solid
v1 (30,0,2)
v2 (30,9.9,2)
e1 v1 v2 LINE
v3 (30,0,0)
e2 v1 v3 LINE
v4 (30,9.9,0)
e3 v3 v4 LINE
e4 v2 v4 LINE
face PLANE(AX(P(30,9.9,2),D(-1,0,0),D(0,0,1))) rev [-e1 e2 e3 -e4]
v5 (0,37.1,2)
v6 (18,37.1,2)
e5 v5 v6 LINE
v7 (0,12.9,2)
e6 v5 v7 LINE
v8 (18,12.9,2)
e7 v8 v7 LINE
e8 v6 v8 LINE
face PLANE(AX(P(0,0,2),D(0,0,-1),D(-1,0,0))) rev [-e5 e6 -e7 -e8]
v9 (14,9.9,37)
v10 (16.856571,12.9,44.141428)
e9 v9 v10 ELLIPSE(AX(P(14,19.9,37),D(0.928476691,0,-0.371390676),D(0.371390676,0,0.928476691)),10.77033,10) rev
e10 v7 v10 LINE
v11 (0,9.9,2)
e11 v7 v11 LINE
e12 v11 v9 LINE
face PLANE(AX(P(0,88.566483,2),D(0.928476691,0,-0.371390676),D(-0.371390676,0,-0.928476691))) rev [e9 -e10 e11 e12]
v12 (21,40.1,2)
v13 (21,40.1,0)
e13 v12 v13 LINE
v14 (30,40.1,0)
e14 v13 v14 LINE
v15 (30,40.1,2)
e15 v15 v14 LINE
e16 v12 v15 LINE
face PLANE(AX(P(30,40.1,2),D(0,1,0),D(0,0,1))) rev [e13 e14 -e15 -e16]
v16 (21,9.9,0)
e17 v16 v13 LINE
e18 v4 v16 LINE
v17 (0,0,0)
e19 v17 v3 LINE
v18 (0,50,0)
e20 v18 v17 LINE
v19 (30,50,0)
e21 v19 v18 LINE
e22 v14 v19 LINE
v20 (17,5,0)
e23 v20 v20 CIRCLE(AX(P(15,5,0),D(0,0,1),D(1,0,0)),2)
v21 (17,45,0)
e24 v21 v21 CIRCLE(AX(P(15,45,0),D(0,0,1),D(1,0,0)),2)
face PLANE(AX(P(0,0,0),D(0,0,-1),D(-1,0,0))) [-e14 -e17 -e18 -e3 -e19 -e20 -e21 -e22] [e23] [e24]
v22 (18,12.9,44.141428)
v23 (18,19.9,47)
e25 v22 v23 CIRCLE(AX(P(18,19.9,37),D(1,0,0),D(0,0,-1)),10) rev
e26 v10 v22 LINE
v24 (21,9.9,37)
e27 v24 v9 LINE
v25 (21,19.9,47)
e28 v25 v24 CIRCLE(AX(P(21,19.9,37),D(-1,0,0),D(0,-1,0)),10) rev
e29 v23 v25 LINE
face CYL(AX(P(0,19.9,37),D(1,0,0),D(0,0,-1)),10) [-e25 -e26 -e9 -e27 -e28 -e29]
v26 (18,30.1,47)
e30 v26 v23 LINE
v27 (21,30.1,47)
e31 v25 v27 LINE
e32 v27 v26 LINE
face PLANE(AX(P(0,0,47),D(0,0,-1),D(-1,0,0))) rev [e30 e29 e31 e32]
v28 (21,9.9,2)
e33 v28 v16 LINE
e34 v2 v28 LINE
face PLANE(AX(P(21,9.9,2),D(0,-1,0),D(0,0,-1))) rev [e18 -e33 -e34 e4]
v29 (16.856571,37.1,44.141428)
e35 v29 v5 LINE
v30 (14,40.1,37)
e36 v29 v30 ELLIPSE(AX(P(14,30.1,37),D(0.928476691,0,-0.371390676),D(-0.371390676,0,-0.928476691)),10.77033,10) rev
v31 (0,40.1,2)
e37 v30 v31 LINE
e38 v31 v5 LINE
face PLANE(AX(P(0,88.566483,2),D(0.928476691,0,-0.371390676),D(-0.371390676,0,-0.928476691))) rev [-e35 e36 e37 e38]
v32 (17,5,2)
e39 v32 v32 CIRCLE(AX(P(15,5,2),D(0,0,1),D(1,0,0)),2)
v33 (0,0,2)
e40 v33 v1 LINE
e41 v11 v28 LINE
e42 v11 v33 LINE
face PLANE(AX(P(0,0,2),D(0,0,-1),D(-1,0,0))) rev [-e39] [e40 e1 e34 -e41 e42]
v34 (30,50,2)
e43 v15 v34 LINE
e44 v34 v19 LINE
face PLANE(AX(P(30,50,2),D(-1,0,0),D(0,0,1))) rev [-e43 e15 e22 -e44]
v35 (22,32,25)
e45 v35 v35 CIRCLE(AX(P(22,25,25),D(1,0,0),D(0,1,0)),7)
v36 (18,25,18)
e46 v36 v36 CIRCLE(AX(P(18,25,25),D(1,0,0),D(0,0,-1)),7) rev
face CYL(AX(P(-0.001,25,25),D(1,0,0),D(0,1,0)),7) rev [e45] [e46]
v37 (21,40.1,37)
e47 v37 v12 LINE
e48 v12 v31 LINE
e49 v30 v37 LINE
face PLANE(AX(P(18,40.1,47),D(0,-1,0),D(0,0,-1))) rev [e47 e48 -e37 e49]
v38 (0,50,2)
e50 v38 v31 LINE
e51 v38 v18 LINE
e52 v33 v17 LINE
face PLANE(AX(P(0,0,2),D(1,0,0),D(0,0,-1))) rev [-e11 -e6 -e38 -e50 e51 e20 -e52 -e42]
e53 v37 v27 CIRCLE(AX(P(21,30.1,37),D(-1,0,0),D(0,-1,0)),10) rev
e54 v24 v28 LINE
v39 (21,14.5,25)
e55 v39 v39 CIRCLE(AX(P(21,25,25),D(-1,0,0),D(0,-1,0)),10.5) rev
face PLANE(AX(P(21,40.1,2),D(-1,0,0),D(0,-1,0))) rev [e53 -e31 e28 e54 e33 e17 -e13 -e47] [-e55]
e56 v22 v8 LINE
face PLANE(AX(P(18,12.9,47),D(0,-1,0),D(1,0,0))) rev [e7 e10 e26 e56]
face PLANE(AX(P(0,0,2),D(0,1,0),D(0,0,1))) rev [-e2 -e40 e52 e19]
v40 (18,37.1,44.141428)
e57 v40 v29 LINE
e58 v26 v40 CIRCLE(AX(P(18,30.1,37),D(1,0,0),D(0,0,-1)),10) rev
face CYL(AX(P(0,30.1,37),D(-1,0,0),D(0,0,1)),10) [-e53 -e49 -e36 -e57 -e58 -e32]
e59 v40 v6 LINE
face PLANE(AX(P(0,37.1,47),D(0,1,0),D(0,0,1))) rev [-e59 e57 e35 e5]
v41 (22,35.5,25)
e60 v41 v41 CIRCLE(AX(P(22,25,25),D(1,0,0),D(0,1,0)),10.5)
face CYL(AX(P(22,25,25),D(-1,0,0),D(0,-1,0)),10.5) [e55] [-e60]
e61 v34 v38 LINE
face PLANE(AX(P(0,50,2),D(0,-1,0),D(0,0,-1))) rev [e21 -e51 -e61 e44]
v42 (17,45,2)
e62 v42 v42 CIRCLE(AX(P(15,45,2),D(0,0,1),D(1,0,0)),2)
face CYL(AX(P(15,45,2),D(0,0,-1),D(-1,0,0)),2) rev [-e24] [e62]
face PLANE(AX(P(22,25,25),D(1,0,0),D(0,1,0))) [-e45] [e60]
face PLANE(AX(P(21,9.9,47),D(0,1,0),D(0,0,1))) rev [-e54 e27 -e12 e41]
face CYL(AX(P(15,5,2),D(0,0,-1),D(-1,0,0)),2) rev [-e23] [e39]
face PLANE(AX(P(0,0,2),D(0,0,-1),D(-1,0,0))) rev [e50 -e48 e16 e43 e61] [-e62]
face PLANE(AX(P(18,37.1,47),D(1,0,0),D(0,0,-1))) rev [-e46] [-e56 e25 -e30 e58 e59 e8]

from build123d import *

# Parameters (mm, degrees)
ESQUISSE1_R             = 2
BOSS_EXTRU_1_DEPTH      = 2
BOSS_EXTRU_2_DEPTH      = 45
ENL_V_MAT_EXTRU_2_REACH = 70.68
ESQUISSE4_R             = 10.5
BOSS_EXTRU_3_DEPTH      = 1
ENL_V_MAT_EXTRU_3_REACH = 74.062
ESQUISSE5_R             = 7
CONG_1_R                = 10


with BuildPart() as part:
    # Esquisse1 → Boss.-Extru.1 (new body)
    with BuildSketch(Plane.XY):
        Polygon((30, 40.1), (21, 40.1), (21, 9.9), (30, 9.9), (30, 0), (0, 0), (0, 50), (30, 50), align=None)
        with Locations((15, 45)):
            Circle(ESQUISSE1_R, mode=Mode.SUBTRACT)
        with Locations((15, 5)):
            Circle(ESQUISSE1_R, mode=Mode.SUBTRACT)
    extrude(amount=BOSS_EXTRU_1_DEPTH)

    # Esquisse2 → Boss.-Extru.2 (add)
    with BuildSketch(Plane.XY.offset(2)):
        Polygon((18, 40.1), (0, 40.1), (0, 37.1), (18, 37.1), (18, 12.9), (0, 12.9), (0, 9.9), (18, 9.9), (21, 9.9), (21, 40.1), align=None)
    extrude(amount=BOSS_EXTRU_2_DEPTH)

    # Enlèv. mat.-Extru.2: up to this face of the body (flat: up to its plane)
    enl_v_mat_extru_2_end = Plane(part.part.faces().sort_by_distance((10.5, 40.1, 24.5))[0])
    # Esquisse3 → Enlèv. mat.-Extru.2 (cut, up to the picked face)
    with BuildSketch(Plane.XZ.offset(-9.9), mode=Mode.PRIVATE) as enl_v_mat_extru_2_sk1:
        Polygon((0, 2), (18, 47), (0, 47), align=None)
    enl_v_mat_extru_2_tool1 = split(extrude(enl_v_mat_extru_2_sk1.sketch, amount=-ENL_V_MAT_EXTRU_2_REACH, mode=Mode.PRIVATE), bisect_by=enl_v_mat_extru_2_end, keep=Keep.BOTH, mode=Mode.PRIVATE)
    add(enl_v_mat_extru_2_tool1.solids().sort_by(Axis((6, 9.9, 32), (0, 1, 0)))[0], mode=Mode.SUBTRACT)

    # Esquisse4 → Boss.-Extru.3 (add)
    with BuildSketch(Plane(origin=(21, 0, 0), x_dir=(0, 0, -1), z_dir=(1, 0, 0))):
        with Locations(Location((-25, 25, 0), (0, 0, 270))):
            Circle(ESQUISSE4_R)
    extrude(amount=BOSS_EXTRU_3_DEPTH)

    # Esquisse5 → Enlèv. mat.-Extru.3 (cut, up to next)
    with BuildSketch(Plane(origin=(22, 0, 0), x_dir=(0, 0, -1), z_dir=(1, 0, 0)), mode=Mode.PRIVATE) as enl_v_mat_extru_3_sk1:
        with Locations(Location((-25, 25, 0), (0, 0, 90))):
            Circle(ESQUISSE5_R)
    enl_v_mat_extru_3_tool1 = extrude(enl_v_mat_extru_3_sk1.sketch, amount=-ENL_V_MAT_EXTRU_3_REACH, mode=Mode.PRIVATE) & part.part
    add(enl_v_mat_extru_3_tool1.solids().sort_by_distance((22, 25, 25))[0], mode=Mode.SUBTRACT)

    # Congé1
    # the kernel refuses this fillet: 10 mm, written as the material it takes off along each edge
    with BuildSketch(Plane(origin=(-7, 40.1, 47), x_dir=(0, 0, -1), z_dir=(1, 0, 0))) as cong_1_piece_1:
        with BuildLine():
            CenterArc((CONG_1_R, -CONG_1_R), CONG_1_R, 90, 90)
            Line((0, -CONG_1_R), (0, 0))
            Line((0, 0), (CONG_1_R, 0))
        make_face()
    extrude(amount=53, mode=Mode.SUBTRACT)
    with BuildSketch(Plane(origin=(46, 9.9, 47), x_dir=(0, 1, 0), z_dir=(-1, 0, 0))) as cong_1_piece_2:
        with BuildLine():
            CenterArc((CONG_1_R, CONG_1_R), CONG_1_R, 180, 90)
            Line((0, CONG_1_R), (0, 0))
            Line((0, 0), (CONG_1_R, 0))
        make_face()
    extrude(amount=53, mode=Mode.SUBTRACT)


solid = part.part
